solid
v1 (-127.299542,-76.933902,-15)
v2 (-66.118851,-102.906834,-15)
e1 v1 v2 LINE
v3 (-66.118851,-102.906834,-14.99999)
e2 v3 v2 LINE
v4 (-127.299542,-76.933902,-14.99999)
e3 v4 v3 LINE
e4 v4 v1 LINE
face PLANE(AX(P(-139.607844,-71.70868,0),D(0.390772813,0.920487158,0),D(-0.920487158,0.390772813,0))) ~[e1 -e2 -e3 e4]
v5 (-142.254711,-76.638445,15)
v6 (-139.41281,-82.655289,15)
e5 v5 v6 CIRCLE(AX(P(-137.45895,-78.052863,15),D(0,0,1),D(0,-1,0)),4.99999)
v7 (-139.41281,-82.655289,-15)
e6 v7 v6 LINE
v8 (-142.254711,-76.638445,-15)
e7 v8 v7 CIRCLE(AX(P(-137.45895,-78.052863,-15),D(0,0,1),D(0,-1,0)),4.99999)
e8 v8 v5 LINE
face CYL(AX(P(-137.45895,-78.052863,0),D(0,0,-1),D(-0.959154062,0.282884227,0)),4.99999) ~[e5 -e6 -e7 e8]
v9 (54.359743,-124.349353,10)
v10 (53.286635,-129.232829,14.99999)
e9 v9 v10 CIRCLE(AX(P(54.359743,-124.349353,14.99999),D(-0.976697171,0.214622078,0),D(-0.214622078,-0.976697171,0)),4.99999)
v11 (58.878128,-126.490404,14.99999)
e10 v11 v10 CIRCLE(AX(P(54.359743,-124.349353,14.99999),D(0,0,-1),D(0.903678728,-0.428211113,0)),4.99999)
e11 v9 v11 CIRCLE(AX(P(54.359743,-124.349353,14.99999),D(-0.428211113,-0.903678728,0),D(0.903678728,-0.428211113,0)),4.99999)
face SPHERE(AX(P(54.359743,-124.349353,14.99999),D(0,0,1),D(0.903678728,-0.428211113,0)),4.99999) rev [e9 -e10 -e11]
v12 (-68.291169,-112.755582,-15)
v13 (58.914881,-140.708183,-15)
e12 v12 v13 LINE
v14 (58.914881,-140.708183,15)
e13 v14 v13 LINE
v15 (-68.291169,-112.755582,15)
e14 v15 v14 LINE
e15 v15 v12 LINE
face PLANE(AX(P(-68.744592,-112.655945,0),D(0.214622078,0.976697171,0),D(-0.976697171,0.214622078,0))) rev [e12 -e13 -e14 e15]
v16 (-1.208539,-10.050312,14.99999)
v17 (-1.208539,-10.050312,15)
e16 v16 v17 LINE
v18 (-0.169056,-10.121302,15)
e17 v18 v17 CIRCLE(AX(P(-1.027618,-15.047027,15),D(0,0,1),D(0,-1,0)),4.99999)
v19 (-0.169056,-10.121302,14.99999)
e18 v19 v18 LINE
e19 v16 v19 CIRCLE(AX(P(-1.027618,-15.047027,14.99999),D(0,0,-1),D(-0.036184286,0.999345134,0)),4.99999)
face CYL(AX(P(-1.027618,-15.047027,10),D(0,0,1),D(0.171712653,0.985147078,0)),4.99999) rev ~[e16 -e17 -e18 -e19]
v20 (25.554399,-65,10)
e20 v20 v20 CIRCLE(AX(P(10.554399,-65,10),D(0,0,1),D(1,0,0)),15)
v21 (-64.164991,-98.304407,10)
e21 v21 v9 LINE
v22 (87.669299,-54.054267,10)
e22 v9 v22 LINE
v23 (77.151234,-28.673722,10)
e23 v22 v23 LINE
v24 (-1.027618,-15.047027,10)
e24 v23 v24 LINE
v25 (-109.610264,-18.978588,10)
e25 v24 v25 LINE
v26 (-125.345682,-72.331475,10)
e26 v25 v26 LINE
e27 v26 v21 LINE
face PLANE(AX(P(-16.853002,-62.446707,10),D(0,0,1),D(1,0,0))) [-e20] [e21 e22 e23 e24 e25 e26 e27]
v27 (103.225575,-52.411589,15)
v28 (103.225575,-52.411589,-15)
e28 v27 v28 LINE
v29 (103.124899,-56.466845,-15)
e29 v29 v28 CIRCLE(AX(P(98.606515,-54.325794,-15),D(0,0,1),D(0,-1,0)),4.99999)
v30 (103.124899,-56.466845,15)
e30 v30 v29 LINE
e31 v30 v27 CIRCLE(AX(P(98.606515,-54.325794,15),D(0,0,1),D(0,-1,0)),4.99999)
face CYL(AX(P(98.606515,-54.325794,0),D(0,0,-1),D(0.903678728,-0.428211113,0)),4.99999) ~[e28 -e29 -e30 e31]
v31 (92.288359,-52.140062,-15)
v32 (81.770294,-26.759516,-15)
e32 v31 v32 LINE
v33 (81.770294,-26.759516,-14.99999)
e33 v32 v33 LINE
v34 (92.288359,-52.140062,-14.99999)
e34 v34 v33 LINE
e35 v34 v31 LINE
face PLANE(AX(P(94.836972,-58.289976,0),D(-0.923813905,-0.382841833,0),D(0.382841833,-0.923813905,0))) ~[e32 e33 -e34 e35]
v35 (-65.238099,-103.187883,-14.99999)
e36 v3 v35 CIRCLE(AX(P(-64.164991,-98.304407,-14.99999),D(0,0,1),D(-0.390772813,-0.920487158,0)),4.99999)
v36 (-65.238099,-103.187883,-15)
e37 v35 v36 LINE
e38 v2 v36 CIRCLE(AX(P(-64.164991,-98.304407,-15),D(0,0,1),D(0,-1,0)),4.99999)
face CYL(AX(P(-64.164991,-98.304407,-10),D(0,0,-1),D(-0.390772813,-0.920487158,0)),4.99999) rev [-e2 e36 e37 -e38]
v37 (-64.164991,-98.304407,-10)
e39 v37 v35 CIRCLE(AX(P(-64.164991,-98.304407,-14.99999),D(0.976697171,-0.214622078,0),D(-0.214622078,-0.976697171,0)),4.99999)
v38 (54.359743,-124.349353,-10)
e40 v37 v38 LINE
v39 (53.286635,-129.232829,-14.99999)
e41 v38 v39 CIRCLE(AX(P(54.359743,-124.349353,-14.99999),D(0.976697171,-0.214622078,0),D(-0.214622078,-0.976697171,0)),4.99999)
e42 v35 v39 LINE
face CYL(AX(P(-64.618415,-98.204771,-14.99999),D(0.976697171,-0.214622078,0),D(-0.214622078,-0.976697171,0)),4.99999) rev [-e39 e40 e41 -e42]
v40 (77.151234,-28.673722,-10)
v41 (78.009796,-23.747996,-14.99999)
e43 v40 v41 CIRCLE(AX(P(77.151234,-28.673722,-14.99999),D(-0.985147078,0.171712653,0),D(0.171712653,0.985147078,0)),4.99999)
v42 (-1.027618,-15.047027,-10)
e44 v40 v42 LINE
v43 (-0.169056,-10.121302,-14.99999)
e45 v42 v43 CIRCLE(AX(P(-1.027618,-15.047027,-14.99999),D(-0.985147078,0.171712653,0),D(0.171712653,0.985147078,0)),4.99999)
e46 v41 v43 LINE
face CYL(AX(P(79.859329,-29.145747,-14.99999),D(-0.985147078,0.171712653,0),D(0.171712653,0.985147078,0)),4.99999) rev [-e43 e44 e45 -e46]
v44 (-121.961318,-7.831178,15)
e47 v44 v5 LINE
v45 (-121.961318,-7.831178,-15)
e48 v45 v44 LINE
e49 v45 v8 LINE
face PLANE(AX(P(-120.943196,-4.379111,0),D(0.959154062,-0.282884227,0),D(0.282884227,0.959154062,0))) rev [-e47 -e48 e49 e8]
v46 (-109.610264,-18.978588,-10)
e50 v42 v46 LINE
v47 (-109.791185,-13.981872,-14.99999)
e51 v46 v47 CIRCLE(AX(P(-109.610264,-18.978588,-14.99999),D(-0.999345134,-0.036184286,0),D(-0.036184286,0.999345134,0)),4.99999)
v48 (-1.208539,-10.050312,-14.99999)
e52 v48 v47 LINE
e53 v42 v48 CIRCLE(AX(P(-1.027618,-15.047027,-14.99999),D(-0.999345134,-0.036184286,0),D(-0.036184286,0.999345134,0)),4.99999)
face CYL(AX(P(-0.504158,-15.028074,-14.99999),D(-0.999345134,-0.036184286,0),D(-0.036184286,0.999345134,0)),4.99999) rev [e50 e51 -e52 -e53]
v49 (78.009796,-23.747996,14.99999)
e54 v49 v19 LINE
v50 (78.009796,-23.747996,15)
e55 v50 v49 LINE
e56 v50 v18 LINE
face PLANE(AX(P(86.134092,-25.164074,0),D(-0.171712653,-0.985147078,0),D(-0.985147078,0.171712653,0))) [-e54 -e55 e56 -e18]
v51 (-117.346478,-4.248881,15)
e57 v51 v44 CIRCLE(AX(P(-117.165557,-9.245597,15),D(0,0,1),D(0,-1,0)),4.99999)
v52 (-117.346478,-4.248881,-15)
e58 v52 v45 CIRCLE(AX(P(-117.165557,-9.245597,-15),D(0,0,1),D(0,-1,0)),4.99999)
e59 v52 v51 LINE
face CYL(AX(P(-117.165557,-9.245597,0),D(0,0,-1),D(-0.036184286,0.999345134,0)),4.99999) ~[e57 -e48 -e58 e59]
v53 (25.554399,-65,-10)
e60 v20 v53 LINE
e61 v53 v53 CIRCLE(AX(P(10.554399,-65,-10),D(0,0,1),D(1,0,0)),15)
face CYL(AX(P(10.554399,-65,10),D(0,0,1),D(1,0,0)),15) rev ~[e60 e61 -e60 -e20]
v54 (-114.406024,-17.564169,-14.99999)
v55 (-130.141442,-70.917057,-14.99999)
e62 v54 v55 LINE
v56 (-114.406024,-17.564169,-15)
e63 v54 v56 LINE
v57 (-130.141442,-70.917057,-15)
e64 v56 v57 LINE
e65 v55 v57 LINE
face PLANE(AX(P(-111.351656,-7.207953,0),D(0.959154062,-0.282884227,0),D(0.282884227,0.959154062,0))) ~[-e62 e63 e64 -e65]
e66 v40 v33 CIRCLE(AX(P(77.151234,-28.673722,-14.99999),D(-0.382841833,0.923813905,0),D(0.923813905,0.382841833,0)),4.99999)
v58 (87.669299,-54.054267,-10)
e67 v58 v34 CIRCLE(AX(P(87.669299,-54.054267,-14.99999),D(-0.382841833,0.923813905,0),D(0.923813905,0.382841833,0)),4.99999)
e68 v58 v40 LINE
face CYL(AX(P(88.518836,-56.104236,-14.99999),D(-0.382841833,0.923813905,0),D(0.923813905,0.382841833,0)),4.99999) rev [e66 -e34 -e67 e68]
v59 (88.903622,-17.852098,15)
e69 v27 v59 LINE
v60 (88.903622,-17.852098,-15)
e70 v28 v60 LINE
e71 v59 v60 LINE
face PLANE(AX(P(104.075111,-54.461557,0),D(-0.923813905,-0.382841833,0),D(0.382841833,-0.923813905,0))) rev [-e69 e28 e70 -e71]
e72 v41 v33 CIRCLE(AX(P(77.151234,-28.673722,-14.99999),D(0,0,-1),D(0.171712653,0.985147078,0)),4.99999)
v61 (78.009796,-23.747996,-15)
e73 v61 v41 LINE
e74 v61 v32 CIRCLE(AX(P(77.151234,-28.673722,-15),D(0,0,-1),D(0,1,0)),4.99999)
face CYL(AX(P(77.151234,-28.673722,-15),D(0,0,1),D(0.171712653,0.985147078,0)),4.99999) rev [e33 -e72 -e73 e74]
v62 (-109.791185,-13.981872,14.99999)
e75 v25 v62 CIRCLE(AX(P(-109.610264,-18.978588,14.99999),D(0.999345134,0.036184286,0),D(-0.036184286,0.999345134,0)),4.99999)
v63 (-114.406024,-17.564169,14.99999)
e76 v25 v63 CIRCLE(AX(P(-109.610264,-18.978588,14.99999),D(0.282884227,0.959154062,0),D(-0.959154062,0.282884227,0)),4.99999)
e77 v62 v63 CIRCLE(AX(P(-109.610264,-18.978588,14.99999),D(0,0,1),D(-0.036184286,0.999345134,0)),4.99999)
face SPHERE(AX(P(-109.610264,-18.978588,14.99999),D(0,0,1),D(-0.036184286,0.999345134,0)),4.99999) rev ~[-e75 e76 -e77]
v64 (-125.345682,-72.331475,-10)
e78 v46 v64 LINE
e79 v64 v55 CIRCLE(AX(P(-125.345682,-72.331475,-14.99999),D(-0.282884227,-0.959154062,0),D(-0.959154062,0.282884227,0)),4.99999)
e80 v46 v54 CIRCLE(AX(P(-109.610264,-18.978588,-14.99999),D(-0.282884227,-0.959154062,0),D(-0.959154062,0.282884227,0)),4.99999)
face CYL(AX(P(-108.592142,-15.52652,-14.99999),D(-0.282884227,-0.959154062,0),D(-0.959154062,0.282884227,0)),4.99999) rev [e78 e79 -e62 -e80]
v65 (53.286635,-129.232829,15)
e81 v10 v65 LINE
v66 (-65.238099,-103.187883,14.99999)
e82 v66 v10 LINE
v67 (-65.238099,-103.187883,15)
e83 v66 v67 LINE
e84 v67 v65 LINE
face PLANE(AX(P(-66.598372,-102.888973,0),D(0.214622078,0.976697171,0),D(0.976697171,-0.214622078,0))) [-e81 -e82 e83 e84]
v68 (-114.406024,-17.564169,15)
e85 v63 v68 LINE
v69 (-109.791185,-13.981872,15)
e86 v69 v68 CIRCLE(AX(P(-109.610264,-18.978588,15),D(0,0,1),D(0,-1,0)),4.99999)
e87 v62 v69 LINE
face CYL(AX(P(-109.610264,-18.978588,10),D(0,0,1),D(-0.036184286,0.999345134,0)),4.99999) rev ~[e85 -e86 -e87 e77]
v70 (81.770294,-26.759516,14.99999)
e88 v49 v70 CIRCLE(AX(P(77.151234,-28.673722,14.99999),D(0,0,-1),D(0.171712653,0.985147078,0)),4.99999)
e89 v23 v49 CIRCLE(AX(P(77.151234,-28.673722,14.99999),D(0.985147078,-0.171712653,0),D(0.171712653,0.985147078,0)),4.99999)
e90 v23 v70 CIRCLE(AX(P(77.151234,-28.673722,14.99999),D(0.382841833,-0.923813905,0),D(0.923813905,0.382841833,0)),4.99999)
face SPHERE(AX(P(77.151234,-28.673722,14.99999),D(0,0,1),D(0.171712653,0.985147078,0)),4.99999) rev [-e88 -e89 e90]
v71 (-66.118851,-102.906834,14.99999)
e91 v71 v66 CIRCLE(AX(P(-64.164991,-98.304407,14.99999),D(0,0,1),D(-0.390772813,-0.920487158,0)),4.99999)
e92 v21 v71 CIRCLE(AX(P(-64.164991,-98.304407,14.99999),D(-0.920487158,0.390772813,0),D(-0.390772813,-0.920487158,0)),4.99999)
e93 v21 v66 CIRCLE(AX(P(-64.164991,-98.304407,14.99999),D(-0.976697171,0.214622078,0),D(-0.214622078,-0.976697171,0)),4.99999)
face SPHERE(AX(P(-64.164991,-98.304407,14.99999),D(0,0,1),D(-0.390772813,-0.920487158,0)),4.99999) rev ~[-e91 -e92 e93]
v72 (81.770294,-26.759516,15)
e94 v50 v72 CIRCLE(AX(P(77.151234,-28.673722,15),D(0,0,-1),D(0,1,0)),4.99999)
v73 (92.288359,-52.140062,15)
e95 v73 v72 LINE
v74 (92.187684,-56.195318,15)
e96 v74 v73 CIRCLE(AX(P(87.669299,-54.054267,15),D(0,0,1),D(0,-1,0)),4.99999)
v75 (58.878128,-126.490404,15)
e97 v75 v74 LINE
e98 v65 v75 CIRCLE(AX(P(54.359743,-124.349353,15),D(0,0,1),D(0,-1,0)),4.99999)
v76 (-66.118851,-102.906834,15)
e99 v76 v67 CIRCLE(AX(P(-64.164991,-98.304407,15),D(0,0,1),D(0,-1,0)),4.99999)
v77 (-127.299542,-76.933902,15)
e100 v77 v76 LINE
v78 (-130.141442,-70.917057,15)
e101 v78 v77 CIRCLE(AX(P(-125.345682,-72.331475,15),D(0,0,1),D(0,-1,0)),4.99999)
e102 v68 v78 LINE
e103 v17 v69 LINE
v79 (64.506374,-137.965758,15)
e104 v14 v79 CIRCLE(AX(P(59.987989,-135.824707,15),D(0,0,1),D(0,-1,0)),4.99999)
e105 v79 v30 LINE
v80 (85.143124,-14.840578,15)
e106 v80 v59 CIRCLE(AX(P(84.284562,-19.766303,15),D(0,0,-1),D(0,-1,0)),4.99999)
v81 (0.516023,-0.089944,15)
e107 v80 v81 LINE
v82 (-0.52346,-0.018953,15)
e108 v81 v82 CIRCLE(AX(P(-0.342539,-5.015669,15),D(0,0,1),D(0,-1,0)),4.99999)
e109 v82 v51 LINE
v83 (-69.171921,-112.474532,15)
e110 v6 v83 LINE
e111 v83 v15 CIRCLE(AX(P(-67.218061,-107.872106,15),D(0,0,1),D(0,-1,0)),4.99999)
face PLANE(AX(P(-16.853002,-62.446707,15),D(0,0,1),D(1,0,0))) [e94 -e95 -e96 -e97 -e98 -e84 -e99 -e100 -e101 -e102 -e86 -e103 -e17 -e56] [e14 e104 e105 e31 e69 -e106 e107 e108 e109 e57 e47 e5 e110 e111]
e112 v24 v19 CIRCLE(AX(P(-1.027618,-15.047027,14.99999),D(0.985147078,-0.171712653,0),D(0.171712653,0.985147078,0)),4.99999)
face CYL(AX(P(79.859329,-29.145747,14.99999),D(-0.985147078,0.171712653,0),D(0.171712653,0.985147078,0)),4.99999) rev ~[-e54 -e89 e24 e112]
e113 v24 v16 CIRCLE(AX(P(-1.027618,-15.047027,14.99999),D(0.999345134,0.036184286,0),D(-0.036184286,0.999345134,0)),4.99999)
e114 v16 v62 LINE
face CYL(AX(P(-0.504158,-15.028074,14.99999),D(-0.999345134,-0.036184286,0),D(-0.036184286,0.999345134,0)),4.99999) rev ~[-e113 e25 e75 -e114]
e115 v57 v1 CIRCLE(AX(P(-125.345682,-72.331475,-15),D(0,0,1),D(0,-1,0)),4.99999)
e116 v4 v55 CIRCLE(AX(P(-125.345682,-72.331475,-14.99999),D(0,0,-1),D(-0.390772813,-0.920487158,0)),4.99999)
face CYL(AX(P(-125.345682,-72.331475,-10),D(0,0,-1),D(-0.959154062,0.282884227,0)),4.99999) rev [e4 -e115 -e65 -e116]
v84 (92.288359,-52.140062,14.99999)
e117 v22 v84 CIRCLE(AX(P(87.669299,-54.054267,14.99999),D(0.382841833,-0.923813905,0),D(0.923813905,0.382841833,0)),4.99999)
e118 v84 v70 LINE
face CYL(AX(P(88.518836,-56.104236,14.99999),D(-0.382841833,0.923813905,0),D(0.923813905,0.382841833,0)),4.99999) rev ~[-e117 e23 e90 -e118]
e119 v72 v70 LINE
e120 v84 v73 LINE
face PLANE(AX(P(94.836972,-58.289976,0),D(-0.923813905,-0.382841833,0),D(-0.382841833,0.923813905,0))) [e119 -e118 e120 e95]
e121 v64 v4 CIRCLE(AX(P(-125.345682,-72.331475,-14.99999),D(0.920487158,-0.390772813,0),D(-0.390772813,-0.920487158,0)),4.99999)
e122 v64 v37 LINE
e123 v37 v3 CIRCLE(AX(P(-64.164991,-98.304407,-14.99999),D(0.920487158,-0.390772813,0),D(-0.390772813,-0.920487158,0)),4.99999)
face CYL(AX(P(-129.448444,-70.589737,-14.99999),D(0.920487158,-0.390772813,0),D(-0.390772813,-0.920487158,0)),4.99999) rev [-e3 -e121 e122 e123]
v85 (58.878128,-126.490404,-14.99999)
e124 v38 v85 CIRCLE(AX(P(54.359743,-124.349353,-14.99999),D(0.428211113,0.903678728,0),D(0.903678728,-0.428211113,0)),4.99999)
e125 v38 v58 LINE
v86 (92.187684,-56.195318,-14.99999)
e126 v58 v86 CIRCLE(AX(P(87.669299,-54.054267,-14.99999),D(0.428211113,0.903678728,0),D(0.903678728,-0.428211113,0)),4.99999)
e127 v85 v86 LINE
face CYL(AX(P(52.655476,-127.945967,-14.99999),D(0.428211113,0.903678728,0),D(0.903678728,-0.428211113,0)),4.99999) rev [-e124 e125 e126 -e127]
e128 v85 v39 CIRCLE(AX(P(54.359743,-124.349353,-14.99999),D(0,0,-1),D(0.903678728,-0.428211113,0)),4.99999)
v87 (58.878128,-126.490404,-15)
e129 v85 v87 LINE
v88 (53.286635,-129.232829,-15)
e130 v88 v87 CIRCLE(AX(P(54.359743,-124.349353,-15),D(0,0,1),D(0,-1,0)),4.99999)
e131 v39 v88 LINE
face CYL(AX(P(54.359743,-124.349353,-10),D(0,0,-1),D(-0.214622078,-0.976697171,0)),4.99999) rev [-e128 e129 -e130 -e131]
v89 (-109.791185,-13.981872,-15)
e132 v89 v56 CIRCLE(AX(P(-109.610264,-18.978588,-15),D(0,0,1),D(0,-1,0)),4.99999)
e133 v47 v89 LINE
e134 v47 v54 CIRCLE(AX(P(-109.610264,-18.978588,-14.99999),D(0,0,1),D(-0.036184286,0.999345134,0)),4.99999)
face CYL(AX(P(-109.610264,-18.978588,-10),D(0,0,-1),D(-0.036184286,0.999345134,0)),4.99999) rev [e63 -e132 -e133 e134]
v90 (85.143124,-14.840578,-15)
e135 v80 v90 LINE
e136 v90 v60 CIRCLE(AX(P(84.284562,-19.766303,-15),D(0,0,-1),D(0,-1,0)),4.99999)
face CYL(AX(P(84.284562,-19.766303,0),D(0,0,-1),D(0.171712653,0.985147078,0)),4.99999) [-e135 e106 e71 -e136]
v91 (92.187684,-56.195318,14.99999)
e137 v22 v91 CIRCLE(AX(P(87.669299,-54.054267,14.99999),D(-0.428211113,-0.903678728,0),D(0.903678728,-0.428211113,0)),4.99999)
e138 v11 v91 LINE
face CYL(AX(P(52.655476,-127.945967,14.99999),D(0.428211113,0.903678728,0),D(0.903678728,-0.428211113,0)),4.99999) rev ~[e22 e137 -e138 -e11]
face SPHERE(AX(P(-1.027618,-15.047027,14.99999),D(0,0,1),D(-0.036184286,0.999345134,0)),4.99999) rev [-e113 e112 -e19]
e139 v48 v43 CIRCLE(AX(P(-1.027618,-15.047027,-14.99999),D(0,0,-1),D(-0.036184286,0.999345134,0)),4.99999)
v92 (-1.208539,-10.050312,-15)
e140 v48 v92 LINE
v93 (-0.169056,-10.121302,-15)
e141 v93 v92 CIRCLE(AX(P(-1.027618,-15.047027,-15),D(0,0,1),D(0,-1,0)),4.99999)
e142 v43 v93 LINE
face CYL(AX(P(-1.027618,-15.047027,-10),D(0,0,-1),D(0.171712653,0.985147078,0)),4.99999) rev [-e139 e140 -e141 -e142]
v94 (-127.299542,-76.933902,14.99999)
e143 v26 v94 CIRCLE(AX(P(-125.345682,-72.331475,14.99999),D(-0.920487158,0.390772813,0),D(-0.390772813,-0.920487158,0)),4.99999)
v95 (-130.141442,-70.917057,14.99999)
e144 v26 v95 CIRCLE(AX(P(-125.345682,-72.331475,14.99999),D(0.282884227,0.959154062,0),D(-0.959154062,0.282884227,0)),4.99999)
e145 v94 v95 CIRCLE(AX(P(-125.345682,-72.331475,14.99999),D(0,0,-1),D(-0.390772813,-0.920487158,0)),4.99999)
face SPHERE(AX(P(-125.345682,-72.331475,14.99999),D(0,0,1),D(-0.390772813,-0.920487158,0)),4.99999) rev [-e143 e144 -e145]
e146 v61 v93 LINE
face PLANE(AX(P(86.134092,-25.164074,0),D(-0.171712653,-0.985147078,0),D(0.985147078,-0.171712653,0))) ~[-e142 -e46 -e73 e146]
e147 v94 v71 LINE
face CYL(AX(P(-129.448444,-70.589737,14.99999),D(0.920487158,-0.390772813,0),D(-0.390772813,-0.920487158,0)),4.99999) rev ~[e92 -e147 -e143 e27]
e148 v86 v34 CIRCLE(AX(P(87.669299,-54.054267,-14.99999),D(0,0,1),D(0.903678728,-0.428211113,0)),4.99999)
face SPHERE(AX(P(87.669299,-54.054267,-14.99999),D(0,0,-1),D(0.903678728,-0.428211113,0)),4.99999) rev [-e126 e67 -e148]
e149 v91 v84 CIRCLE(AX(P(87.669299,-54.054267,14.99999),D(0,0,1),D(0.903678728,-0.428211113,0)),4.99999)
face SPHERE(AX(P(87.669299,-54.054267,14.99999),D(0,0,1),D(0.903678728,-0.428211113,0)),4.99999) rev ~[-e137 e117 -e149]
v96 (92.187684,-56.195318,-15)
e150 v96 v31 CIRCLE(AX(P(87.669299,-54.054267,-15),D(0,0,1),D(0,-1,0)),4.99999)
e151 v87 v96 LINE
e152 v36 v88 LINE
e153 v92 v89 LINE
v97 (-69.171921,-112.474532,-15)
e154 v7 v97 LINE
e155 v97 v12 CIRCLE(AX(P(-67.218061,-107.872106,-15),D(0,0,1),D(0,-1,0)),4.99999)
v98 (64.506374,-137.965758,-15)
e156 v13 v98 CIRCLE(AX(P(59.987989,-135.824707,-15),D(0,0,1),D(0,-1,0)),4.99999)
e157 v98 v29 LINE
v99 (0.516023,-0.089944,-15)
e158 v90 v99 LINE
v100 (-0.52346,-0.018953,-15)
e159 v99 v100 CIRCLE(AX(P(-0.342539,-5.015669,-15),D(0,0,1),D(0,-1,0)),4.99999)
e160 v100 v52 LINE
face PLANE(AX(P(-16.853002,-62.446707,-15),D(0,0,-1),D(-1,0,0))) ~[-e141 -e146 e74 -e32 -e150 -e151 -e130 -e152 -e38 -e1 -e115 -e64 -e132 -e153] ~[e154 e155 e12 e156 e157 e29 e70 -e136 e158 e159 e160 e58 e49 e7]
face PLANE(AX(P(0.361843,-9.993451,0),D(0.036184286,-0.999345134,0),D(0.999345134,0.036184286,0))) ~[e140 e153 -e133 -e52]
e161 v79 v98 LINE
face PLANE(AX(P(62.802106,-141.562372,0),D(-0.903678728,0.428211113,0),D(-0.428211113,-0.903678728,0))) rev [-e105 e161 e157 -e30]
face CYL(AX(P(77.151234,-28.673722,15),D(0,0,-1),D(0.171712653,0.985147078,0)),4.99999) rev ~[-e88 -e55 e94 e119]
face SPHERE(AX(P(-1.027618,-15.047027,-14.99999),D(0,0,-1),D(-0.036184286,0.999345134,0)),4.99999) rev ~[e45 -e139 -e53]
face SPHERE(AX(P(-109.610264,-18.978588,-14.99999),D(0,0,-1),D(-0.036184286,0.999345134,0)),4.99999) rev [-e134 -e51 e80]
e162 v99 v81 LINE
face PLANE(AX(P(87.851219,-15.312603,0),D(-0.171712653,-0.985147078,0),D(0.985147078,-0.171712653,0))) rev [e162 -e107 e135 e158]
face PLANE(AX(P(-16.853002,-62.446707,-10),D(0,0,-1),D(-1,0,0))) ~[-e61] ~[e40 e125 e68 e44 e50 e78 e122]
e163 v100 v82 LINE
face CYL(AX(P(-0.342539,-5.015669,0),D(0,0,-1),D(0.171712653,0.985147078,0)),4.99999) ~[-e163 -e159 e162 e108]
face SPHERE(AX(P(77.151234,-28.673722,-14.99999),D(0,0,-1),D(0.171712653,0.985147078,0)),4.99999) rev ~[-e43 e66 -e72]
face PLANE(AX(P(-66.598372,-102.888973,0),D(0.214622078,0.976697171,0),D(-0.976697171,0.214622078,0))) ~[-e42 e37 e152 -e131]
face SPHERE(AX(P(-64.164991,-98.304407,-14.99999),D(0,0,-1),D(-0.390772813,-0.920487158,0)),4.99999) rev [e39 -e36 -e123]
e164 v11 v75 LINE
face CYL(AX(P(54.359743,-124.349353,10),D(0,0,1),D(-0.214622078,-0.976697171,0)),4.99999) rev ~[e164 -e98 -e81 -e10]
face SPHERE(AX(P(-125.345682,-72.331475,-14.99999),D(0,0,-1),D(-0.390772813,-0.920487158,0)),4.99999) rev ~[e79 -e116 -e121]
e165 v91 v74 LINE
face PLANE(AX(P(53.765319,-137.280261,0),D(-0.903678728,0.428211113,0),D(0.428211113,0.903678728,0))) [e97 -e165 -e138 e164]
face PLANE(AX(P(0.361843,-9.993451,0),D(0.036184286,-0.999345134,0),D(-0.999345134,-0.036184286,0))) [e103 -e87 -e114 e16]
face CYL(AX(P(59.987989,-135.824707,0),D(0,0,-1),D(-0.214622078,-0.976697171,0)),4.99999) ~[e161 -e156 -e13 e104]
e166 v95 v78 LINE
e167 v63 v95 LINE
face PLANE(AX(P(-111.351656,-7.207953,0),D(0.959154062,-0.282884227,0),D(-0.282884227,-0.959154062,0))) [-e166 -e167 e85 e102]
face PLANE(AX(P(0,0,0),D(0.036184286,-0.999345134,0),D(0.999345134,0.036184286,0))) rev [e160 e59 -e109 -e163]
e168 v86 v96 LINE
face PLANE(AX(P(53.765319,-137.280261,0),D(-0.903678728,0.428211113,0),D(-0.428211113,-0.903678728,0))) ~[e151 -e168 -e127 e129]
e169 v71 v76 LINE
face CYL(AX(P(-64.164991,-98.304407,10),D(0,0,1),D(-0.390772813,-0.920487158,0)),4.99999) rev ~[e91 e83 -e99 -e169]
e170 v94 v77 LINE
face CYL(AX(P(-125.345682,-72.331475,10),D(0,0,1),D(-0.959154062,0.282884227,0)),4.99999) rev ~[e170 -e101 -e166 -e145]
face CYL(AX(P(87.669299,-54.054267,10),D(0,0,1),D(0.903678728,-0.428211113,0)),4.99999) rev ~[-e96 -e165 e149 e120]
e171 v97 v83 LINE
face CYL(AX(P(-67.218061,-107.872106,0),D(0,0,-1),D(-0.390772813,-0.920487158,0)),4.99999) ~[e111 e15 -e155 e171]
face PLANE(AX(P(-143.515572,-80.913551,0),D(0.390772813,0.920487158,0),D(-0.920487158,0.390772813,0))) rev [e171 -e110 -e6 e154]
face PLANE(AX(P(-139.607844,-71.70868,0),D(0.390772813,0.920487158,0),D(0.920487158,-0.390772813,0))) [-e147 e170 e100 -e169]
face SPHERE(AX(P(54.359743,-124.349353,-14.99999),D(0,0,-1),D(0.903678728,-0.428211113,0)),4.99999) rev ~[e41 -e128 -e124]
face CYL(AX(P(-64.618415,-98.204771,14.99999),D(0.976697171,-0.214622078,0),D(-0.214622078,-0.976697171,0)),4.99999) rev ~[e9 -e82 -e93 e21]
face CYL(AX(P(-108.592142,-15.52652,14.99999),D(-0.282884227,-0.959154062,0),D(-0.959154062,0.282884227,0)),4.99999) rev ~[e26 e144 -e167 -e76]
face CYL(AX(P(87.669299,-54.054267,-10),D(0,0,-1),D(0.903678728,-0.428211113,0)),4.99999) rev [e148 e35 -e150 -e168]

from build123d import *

# Parameters (mm, degrees)
F1_DEPTH = 15
F2_T     = -10
F3_R     = 4.99999
F5_R     = 15
F6_DEPTH = 25


# Not quite as in the source:
# - a fillet or chamfer is up to 0.001 mm smaller than in the source, because OpenCascade refuses the exact size


with BuildPart() as f1:
    # F0 (on Top) → F1 (new body)
    with BuildSketch(Plane.XY):
        Polygon((87.8512188792, -15.3126027435), (0, 0), (-120.9431961179, -4.3791108765), (-143.5155719519, -80.9135511518), (-68.7445923686, -112.6559451222), (62.802106142, -141.5623724461), (104.0751114488, -54.4615574181), align=None)
    extrude(amount=F1_DEPTH)

    # F2
    f2_openings = [f1.faces().sort_by_distance(p)[0] for p in [
        (-14.831711, -62.307507, 15),
    ]]
    offset(amount=F2_T, openings=f2_openings)

    # F3 (radius 5 in the source; OpenCascade refuses exactly that, so slightly less here)
    f3_edges = [f1.edges().sort_by_distance(p)[0] for p in [
        (-143.515572, -80.913551, 7.5),
        (-68.744592, -112.655945, 7.5),
        (62.802106, -141.562372, 7.5),
        (104.075111, -54.461557, 7.5),
        (87.851219, -15.312603, 7.5),
        (0, 0, 7.5),
        (-120.943196, -4.379111, 7.5),
        (75.155878, -92.138524, 10),
        (-4.258831, -116.587633, 10),
        (57.17386, -130.087018, 12.5),
        (-65.691523, -103.088247, 12.5),
        (-98.546913, -89.140205, 10),
        (86.927893, -39.205026, 10),
        (93.137896, -54.19003, 12.5),
        (80.717891, -24.220021, 12.5),
        (40.016406, -17.12569, 10),
        (-0.685079, -10.031358, 12.5),
        (-57.036491, -12.07173, 10),
        (-122.395103, -44.652133, 10),
        (-113.387903, -14.112102, 12.5),
        (-131.402304, -75.192163, 12.5),
    ]]
    fillet(f3_edges, radius=F3_R)

    # F4: F1 across plane


with BuildPart() as f1_1:
    add(f1.part)
    add(f1.part.mirror(Plane.XY))

    # F5 (on face) → F6 (cut)
    with BuildSketch(Plane.XY.offset(10)):
        with Locations((10.5543992388, -65)):
            Circle(F5_R)
    extrude(amount=-F6_DEPTH, mode=Mode.SUBTRACT)


solid = f1_1.part
